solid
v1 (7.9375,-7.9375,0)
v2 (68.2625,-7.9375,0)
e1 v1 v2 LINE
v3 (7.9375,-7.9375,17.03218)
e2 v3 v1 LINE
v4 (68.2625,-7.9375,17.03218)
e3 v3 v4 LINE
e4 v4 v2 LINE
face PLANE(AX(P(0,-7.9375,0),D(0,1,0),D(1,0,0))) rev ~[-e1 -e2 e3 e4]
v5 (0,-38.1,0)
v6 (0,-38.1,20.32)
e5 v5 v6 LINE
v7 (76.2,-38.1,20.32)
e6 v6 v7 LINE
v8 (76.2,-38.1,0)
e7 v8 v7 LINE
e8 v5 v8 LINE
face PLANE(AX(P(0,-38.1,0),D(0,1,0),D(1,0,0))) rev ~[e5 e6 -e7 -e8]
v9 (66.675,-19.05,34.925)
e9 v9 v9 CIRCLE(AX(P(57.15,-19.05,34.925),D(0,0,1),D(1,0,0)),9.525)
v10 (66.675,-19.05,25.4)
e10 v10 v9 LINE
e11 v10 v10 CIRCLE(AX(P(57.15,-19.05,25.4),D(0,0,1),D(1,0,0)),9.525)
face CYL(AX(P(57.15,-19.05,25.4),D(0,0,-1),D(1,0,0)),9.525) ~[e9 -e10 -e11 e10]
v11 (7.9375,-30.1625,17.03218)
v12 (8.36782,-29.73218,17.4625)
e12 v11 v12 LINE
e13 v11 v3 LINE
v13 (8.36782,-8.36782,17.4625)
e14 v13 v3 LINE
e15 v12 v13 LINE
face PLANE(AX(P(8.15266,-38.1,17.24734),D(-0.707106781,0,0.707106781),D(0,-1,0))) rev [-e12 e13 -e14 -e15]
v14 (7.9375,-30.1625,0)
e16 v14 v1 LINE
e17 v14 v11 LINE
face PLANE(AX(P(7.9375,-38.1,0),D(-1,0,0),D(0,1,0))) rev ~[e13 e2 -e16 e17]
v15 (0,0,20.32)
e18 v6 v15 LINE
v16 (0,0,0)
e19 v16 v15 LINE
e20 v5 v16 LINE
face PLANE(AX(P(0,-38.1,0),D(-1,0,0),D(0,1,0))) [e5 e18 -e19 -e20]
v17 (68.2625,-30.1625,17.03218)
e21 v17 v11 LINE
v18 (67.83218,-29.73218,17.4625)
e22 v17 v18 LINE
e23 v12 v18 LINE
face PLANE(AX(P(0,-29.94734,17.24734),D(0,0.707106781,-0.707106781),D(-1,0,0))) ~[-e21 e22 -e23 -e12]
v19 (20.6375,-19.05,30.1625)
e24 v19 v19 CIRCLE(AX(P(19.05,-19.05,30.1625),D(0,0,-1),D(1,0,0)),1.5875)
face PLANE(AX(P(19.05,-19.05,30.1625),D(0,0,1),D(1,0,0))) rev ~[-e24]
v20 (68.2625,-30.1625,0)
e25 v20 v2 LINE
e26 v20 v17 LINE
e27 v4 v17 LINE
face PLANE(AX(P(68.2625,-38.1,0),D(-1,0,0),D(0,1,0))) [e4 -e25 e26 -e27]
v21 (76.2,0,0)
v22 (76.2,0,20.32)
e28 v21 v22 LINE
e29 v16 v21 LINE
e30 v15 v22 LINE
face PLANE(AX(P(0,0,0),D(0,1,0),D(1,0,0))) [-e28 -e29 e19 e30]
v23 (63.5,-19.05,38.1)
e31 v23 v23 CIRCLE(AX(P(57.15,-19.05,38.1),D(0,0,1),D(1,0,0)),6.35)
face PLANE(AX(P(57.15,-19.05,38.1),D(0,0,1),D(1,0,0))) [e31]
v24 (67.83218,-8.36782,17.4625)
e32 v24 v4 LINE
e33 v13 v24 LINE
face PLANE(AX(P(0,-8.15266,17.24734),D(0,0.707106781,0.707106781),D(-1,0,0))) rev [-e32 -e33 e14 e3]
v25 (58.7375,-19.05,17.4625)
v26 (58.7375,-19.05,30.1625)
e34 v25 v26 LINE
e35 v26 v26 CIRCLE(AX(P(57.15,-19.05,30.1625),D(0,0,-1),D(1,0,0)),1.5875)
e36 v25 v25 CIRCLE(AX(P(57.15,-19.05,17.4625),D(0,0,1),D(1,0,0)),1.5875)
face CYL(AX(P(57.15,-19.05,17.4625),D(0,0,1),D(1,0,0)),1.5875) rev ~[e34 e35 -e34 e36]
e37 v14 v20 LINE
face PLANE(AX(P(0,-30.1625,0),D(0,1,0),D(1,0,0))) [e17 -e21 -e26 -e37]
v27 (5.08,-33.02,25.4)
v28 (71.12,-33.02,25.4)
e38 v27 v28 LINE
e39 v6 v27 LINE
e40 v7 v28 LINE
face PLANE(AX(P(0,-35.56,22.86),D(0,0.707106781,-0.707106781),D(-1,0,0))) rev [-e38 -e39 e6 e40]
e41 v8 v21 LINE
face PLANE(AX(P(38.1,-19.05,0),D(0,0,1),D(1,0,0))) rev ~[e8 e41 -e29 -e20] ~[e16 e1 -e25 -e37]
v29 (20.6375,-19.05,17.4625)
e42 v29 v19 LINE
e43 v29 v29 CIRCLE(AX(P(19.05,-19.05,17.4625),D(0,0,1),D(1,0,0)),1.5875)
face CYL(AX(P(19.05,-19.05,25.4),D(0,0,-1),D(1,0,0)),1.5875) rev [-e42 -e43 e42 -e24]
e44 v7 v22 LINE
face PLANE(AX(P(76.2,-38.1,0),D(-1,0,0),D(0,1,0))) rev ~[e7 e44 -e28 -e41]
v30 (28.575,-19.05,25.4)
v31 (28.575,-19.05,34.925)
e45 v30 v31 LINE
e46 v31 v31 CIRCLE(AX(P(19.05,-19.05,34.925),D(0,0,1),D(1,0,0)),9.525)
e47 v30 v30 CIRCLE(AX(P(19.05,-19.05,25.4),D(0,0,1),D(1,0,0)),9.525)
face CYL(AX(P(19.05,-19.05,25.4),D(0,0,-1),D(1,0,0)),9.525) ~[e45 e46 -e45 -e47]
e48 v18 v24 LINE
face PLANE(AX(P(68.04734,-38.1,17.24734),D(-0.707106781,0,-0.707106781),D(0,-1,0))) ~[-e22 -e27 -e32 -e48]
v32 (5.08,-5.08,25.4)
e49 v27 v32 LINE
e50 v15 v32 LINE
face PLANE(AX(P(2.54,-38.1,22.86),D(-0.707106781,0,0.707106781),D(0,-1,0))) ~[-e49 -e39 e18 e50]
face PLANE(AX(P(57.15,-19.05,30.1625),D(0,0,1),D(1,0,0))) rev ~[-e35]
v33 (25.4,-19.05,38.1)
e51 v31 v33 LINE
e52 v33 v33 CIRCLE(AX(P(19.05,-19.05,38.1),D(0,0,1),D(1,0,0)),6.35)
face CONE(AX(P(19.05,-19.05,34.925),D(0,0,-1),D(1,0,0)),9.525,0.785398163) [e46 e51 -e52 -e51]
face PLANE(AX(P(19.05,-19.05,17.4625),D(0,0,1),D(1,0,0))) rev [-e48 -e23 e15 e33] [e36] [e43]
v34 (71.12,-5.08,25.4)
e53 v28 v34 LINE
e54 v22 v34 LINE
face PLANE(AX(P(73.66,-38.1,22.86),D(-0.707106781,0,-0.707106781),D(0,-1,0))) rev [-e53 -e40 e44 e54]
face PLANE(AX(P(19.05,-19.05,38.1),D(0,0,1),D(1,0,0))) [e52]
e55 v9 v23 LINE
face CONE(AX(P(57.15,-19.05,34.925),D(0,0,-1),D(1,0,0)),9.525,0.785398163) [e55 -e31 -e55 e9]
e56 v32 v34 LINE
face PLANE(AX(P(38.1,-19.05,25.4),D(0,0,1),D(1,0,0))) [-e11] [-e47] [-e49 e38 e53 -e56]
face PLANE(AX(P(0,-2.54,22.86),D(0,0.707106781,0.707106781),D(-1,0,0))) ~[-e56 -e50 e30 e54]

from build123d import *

# Parameters (mm, degrees)
F0_W     = 76.2
F0_H     = 38.1
F1_DEPTH = 25.4
F2_SIZE  = 5.08
F3_R     = 9.525
F4_DEPTH = 12.7
F5_SIZE2 = 3.175
F5_SIZE  = 3.175
F6_T     = 7.9375


# Not quite as in the source:
# - a shell that OpenCascade refuses in one call is made with other operations: the cavity is built on its own and cut out


with BuildPart() as f1:
    # F0 (on Top) → F1 (new body)
    with BuildSketch(Plane.XY):
        with Locations((38.1, -19.05)):
            Rectangle(F0_W, F0_H)
    extrude(amount=F1_DEPTH)

    # F2
    f2_edges = [f1.edges().sort_by_distance(p)[0] for p in [
        (38.1, -38.1, 25.4),
        (76.2, -19.05, 25.4),
        (38.1, 0, 25.4),
        (0, -19.05, 25.4),
    ]]
    chamfer(f2_edges, length=F2_SIZE)

    # F3 (on face) → F4 (join)
    with BuildSketch(Plane.XY.offset(25.4)):
        with Locations((19.05, -19.05)):
            Circle(F3_R)
        with Locations((57.15, -19.05)):
            Circle(F3_R)
    extrude(amount=F4_DEPTH)

    # F5
    f5_edges = [f1.edges().sort_by_distance(p)[0] for p in [
        (9.525, -19.05, 38.1),
        (47.625, -19.05, 38.1),
    ]]
    chamfer(f5_edges, length=F5_SIZE, length2=F5_SIZE2)

    # F6: shell of thickness 7.9375, made by hand


with BuildPart() as f6_core1:
    # F6_t2: copy of F1
    add(f1.part)

    # the walls: a layer under each face that stays
    f6_faces = [f6_core1.faces().sort_by_distance(p)[0] for p in [
        (9.525, -19.05, 30.1625),
        (11.1125, -19.05, 36.5125),
        (38.1, -19.05, 25.4),
        (19.05, -19.05, 38.1),
        (38.1, -35.56, 22.86),
        (2.54, -19.05, 22.86),
        (73.66, -19.05, 22.86),
        (38.1, -2.54, 22.86),
        (47.625, -19.05, 30.1625),
        (38.1, -38.1, 10.16),
        (0, -19.05, 10.16),
        (76.2, -19.05, 10.16),
        (38.1, 0, 10.16),
        (49.2125, -19.05, 36.5125),
        (57.15, -19.05, 38.1),
    ]]
    thicken(f6_faces, amount=-F6_T, mode=Mode.SUBTRACT)

    # F6_s3 → F6_t4 (revolve, cut)
    with BuildSketch(Plane.XZ.offset(19.05)):
        Polygon((28.654375, 25.479375), (20.6375, 25.4), (20.6375, 17.4625), (28.575, 17.4625), align=None)
    revolve(axis=Axis((19.05, -19.05, 25.4), (0, 0, 1)), mode=Mode.SUBTRACT)

    # F6_s5 → F6_t6 (revolve, cut)
    with BuildSketch(Plane.XZ.offset(19.05)):
        Polygon((66.754375, 25.479375), (66.675, 17.4625), (58.7375, 17.4625), (58.7375, 25.4), align=None)
    revolve(axis=Axis((57.15, -19.05, 25.4), (0, 0, 1)), mode=Mode.SUBTRACT)


with BuildPart() as f1_1:
    add(f1.part)

    # what is left inside the walls is the cavity
    f6_cavity = [f6_core1.part.solids().sort_by_distance(p)[0] for p in [
        (38.1, -22.754167, 0.079375),
    ]]
    add(f6_cavity, mode=Mode.SUBTRACT)


solid = f1_1.part
